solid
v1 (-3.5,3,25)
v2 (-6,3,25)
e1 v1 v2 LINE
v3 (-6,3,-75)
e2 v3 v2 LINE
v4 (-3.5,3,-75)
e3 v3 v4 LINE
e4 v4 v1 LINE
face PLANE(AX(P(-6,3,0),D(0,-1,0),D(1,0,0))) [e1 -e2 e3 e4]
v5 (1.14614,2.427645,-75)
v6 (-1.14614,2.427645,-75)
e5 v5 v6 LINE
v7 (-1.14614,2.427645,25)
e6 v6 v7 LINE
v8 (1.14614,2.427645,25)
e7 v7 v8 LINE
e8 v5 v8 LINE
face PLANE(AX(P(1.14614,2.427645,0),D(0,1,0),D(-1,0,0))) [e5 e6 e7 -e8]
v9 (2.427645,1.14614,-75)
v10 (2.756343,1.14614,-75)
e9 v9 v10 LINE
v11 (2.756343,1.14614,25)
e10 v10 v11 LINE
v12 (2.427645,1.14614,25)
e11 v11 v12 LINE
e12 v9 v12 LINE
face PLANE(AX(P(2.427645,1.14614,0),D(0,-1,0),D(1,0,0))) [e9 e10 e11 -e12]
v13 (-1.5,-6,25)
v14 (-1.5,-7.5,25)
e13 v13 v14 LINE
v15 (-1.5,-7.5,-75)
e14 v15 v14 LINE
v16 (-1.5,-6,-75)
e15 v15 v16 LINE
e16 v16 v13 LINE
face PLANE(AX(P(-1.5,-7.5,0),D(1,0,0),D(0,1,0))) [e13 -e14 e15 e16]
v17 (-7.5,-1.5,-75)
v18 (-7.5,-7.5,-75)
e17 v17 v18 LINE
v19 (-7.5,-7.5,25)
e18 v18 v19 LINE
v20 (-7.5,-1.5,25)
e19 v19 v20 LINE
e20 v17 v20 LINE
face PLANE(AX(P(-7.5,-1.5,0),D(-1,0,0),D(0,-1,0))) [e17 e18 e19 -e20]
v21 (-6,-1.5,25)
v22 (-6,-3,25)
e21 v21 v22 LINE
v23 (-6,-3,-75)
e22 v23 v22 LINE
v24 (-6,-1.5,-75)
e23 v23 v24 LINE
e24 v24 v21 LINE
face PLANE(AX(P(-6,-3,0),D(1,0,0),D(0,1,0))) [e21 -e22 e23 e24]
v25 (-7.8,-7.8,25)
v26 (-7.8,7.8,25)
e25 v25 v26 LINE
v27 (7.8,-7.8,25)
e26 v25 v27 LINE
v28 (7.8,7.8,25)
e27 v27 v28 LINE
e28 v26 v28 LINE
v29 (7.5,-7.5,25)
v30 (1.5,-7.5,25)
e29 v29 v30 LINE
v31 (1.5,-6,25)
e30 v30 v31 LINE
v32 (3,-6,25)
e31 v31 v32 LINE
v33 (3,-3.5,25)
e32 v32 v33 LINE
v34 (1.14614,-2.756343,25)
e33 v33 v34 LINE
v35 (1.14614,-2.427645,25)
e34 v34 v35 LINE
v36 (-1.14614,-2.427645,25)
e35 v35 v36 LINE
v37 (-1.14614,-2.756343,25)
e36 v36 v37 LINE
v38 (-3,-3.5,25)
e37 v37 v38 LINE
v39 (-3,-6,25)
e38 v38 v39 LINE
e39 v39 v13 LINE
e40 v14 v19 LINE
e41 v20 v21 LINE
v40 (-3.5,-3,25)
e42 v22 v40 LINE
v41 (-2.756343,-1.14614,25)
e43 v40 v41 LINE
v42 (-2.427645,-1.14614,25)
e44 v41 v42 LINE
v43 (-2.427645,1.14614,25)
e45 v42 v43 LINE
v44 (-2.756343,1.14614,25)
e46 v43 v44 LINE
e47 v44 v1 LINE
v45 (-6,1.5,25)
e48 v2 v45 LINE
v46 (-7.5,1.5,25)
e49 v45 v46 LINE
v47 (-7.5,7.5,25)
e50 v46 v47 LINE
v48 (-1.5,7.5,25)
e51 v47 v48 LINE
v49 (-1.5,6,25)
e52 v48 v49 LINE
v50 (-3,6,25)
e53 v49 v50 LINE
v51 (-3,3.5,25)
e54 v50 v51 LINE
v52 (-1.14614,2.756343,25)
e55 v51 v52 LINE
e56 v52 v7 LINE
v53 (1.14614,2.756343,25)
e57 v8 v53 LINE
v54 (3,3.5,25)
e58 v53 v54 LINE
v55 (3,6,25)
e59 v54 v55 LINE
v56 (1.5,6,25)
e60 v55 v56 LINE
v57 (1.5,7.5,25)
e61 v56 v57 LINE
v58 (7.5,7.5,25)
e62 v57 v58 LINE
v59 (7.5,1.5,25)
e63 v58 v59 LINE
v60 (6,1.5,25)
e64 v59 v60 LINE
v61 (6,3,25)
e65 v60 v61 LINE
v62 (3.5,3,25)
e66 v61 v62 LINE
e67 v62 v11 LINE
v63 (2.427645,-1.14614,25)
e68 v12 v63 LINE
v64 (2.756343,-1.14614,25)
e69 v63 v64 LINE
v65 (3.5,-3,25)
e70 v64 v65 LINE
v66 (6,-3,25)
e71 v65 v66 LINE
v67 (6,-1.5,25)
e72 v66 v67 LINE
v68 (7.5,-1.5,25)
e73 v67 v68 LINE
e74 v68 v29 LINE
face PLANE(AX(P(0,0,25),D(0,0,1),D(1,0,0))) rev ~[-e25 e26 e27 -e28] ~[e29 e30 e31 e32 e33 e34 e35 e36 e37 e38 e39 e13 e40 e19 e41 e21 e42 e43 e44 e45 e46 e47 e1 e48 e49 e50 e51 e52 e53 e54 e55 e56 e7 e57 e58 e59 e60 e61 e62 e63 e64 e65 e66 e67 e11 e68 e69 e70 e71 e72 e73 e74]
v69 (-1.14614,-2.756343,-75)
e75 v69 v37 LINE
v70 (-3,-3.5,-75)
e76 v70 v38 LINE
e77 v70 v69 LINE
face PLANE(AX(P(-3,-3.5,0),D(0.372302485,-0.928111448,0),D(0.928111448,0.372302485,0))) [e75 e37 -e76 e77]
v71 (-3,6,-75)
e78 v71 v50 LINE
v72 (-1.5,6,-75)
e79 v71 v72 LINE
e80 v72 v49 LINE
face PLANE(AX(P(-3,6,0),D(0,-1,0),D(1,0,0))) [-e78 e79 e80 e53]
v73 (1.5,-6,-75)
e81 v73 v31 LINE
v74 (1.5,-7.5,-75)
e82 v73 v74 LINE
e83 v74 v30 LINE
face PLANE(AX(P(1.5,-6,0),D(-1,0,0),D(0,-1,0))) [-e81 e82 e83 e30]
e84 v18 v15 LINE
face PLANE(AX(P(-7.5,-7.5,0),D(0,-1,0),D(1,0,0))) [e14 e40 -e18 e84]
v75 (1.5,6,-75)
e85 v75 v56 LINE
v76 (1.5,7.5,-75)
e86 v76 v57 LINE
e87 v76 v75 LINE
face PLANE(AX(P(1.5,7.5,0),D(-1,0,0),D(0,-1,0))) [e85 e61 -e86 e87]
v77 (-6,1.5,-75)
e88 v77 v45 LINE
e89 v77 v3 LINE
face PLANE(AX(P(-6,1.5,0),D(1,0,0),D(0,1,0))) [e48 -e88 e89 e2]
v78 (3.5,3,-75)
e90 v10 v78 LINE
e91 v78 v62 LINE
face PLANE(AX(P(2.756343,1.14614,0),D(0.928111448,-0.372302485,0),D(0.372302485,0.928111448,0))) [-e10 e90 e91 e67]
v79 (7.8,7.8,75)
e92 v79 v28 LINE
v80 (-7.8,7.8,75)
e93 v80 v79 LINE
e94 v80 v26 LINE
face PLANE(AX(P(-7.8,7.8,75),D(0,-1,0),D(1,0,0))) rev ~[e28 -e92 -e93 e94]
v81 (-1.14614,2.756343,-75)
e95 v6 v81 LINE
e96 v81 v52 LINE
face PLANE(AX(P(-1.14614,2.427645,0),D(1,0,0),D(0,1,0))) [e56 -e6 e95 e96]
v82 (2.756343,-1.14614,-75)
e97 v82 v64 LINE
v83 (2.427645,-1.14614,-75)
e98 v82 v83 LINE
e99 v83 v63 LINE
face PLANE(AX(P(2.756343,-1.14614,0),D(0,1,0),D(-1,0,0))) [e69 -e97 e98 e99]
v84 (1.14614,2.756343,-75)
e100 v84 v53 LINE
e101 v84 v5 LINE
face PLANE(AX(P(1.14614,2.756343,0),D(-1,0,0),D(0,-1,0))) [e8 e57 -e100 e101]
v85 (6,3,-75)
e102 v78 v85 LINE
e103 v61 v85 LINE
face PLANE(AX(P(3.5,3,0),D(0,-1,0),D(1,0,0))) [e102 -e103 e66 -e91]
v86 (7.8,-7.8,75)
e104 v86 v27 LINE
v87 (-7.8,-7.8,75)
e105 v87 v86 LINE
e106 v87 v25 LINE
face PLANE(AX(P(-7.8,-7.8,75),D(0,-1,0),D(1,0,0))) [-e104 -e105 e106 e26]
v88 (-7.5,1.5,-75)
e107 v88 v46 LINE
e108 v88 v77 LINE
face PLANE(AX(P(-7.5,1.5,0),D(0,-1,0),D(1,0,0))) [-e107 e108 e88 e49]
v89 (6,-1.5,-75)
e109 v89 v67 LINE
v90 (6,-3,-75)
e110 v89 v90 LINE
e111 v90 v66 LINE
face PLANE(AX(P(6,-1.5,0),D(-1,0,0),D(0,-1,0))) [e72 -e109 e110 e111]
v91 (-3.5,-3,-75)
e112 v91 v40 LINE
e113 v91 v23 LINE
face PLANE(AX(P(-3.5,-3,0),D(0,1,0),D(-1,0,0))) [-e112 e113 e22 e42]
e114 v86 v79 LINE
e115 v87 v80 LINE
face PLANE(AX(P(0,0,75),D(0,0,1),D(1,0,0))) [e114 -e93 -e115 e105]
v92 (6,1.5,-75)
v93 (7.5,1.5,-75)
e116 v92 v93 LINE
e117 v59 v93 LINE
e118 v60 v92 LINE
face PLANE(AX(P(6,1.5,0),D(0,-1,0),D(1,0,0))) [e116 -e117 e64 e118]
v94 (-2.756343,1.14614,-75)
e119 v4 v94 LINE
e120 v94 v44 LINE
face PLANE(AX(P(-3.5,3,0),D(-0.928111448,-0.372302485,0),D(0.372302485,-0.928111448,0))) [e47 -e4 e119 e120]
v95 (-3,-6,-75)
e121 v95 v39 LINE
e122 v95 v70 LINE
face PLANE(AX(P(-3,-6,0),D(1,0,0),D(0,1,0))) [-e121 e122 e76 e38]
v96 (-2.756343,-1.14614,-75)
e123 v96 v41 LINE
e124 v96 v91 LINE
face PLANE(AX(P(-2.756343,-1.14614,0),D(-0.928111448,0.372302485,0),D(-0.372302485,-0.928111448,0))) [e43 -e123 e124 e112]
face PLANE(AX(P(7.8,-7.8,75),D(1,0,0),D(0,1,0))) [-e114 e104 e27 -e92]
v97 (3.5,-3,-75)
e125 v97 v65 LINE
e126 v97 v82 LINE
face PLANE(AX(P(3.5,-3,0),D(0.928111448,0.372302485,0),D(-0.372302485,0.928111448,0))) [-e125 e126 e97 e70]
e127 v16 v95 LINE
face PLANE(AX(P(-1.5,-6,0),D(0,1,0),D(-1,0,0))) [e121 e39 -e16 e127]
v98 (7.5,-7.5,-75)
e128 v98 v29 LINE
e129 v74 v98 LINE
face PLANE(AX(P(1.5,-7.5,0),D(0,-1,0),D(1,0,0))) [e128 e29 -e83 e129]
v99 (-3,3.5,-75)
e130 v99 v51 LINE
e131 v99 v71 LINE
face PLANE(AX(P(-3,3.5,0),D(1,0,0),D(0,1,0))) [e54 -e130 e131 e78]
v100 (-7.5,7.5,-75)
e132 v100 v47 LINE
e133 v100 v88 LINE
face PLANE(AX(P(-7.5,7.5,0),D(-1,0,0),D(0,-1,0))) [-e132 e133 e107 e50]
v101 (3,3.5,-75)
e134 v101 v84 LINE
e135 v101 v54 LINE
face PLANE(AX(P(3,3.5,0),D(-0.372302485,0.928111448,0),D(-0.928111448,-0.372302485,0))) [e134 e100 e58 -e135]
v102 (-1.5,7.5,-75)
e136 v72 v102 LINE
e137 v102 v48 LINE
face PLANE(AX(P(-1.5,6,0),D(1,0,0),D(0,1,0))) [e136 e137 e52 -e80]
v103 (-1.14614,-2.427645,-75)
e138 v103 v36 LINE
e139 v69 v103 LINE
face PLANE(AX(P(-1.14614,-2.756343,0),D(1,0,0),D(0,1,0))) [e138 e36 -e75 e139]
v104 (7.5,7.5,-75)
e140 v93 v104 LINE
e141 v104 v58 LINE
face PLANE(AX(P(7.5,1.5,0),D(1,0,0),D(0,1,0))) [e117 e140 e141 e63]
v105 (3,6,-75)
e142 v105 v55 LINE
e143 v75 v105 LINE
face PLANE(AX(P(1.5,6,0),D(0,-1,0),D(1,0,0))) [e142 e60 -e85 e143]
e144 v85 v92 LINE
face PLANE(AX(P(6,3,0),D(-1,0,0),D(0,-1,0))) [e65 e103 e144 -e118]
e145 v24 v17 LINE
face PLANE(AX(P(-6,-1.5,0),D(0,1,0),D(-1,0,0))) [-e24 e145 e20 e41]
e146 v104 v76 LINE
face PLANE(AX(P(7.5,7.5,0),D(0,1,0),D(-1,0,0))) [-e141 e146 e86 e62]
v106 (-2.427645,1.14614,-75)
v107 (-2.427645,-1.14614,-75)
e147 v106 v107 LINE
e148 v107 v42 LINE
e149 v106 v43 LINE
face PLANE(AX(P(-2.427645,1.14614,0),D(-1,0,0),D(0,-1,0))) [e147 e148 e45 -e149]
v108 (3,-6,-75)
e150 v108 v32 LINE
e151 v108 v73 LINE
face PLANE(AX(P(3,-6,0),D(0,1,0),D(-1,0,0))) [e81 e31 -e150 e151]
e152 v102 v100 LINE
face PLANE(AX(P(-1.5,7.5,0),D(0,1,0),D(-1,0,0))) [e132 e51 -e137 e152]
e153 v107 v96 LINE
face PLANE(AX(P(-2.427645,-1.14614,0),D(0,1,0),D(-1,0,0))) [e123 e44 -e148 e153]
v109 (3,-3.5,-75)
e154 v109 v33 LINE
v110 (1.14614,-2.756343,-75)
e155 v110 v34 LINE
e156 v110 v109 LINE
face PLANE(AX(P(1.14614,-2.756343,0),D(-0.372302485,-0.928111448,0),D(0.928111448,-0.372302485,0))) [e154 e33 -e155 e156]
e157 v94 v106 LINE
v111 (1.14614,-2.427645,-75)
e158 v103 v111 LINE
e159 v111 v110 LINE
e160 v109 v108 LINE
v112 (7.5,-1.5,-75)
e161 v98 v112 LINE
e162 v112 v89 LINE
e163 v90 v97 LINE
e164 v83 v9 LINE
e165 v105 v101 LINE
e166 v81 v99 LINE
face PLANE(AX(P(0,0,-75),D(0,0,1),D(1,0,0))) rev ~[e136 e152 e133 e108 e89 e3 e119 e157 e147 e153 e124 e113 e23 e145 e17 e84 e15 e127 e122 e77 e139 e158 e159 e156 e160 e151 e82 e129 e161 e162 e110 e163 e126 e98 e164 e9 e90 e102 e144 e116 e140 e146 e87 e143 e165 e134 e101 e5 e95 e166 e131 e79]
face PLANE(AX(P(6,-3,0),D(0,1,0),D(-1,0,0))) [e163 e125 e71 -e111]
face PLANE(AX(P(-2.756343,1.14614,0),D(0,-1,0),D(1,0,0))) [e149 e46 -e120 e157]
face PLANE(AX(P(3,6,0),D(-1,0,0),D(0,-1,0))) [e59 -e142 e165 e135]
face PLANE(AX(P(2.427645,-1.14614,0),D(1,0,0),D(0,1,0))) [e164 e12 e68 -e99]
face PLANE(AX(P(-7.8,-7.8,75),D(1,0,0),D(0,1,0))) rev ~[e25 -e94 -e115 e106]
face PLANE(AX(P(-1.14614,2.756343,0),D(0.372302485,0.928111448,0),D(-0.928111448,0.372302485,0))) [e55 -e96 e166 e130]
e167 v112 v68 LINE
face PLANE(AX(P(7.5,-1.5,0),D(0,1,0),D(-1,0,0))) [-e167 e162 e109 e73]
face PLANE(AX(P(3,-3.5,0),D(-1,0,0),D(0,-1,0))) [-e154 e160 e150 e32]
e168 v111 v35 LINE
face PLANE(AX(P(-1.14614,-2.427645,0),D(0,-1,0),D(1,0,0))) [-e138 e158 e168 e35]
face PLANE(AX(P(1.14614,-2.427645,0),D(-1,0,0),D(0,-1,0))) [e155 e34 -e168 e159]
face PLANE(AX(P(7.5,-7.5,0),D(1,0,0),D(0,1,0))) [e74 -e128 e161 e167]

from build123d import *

# Parameters (mm, degrees)
F1_DEPTH = 75
F2_W     = 15.6
F2_H     = 15.6
F3_DEPTH = 50


# Not quite as in the source:
# - ends of sketch curves that miss each other by under 0.0002 mm in the source are joined


with BuildPart() as f1:
    # F0 (on Top) → F1 (new body, symmetric)
    with BuildSketch(Plane.XY):
        Polygon((7.5, 1.5), (7.5, 7.5), (1.5, 7.5), (1.5, 6), (3, 6), (3, 3.5), (1.1461396934, 2.7563427575), (1.1461396934, 2.42764467), (-1.1461396934, 2.42764467), (-1.1461396934, 2.7563427575), (-3, 3.5), (-3, 6), (-1.5, 6), (-1.5, 7.5), (-7.5, 7.5), (-7.5, 1.5), (-6, 1.5), (-6, 3), (-3.5, 3), (-2.7563427575, 1.1461396934), (-2.42764467, 1.1461396934), (-2.42764467, -1.1461396934), (-2.7563427575, -1.1461396934), (-3.5, -3), (-6, -3), (-6, -1.5), (-7.5, -1.5), (-7.5, -7.5), (-1.5, -7.5), (-1.5, -6), (-3, -6), (-3, -3.5), (-1.1461396934, -2.7563427575), (-1.1461396934, -2.42764467), (1.1461396934, -2.42764467), (1.1461396934, -2.7563427575), (3, -3.5), (3, -6), (1.5, -6), (1.5, -7.5), (7.5, -7.5), (7.5, -1.5), (6, -1.5), (6, -3), (3.5, -3), (2.7563427575, -1.1461396934), (2.42764467, -1.1461396934), (2.42764467, 1.1461396934), (2.7563427575, 1.1461396934), (3.5, 3), (6, 3), (6, 1.5), align=None)
    extrude(amount=F1_DEPTH, both=True)

    # F2 (on face) → F3 (join)
    with BuildSketch(Plane.XY.offset(75)):
        Rectangle(F2_W, F2_H)
        Polygon((7.5, 7.5), (7.5, 1.5), (6, 1.5), (6, 3), (3.5, 3), (2.7563427575, 1.1461396934), (2.42764467, 1.1461396934), (2.42764467, -1.1461396934), (2.7563427575, -1.1461396934), (3.5, -3), (6, -3), (6, -1.5), (7.5, -1.5), (7.5, -7.5), (1.5, -7.5), (1.5, -6), (3, -6), (3, -3.5), (1.1461396934, -2.7563427575), (1.1461396934, -2.42764467), (-1.1461396934, -2.42764467), (-1.1461396934, -2.7563427575), (-3, -3.5), (-3, -6), (-1.5, -6), (-1.5, -7.5), (-7.5, -7.5), (-7.5, -1.5), (-6, -1.5), (-6, -3), (-3.5, -3), (-2.7563427575, -1.1461396934), (-2.42764467, -1.1461396934), (-2.42764467, 1.1461396934), (-2.7563427575, 1.1461396934), (-3.5, 3), (-6, 3), (-6, 1.5), (-7.5, 1.5), (-7.5, 7.5), (-1.5, 7.5), (-1.5, 6), (-3, 6), (-3, 3.5), (-1.1461396934, 2.7563427575), (-1.1461396934, 2.42764467), (1.1461396934, 2.42764467), (1.1461396934, 2.7563427575), (3, 3.5), (3, 6), (1.5, 6), (1.5, 7.5), align=None, mode=Mode.SUBTRACT)
    extrude(amount=-F3_DEPTH)


solid = f1.part
